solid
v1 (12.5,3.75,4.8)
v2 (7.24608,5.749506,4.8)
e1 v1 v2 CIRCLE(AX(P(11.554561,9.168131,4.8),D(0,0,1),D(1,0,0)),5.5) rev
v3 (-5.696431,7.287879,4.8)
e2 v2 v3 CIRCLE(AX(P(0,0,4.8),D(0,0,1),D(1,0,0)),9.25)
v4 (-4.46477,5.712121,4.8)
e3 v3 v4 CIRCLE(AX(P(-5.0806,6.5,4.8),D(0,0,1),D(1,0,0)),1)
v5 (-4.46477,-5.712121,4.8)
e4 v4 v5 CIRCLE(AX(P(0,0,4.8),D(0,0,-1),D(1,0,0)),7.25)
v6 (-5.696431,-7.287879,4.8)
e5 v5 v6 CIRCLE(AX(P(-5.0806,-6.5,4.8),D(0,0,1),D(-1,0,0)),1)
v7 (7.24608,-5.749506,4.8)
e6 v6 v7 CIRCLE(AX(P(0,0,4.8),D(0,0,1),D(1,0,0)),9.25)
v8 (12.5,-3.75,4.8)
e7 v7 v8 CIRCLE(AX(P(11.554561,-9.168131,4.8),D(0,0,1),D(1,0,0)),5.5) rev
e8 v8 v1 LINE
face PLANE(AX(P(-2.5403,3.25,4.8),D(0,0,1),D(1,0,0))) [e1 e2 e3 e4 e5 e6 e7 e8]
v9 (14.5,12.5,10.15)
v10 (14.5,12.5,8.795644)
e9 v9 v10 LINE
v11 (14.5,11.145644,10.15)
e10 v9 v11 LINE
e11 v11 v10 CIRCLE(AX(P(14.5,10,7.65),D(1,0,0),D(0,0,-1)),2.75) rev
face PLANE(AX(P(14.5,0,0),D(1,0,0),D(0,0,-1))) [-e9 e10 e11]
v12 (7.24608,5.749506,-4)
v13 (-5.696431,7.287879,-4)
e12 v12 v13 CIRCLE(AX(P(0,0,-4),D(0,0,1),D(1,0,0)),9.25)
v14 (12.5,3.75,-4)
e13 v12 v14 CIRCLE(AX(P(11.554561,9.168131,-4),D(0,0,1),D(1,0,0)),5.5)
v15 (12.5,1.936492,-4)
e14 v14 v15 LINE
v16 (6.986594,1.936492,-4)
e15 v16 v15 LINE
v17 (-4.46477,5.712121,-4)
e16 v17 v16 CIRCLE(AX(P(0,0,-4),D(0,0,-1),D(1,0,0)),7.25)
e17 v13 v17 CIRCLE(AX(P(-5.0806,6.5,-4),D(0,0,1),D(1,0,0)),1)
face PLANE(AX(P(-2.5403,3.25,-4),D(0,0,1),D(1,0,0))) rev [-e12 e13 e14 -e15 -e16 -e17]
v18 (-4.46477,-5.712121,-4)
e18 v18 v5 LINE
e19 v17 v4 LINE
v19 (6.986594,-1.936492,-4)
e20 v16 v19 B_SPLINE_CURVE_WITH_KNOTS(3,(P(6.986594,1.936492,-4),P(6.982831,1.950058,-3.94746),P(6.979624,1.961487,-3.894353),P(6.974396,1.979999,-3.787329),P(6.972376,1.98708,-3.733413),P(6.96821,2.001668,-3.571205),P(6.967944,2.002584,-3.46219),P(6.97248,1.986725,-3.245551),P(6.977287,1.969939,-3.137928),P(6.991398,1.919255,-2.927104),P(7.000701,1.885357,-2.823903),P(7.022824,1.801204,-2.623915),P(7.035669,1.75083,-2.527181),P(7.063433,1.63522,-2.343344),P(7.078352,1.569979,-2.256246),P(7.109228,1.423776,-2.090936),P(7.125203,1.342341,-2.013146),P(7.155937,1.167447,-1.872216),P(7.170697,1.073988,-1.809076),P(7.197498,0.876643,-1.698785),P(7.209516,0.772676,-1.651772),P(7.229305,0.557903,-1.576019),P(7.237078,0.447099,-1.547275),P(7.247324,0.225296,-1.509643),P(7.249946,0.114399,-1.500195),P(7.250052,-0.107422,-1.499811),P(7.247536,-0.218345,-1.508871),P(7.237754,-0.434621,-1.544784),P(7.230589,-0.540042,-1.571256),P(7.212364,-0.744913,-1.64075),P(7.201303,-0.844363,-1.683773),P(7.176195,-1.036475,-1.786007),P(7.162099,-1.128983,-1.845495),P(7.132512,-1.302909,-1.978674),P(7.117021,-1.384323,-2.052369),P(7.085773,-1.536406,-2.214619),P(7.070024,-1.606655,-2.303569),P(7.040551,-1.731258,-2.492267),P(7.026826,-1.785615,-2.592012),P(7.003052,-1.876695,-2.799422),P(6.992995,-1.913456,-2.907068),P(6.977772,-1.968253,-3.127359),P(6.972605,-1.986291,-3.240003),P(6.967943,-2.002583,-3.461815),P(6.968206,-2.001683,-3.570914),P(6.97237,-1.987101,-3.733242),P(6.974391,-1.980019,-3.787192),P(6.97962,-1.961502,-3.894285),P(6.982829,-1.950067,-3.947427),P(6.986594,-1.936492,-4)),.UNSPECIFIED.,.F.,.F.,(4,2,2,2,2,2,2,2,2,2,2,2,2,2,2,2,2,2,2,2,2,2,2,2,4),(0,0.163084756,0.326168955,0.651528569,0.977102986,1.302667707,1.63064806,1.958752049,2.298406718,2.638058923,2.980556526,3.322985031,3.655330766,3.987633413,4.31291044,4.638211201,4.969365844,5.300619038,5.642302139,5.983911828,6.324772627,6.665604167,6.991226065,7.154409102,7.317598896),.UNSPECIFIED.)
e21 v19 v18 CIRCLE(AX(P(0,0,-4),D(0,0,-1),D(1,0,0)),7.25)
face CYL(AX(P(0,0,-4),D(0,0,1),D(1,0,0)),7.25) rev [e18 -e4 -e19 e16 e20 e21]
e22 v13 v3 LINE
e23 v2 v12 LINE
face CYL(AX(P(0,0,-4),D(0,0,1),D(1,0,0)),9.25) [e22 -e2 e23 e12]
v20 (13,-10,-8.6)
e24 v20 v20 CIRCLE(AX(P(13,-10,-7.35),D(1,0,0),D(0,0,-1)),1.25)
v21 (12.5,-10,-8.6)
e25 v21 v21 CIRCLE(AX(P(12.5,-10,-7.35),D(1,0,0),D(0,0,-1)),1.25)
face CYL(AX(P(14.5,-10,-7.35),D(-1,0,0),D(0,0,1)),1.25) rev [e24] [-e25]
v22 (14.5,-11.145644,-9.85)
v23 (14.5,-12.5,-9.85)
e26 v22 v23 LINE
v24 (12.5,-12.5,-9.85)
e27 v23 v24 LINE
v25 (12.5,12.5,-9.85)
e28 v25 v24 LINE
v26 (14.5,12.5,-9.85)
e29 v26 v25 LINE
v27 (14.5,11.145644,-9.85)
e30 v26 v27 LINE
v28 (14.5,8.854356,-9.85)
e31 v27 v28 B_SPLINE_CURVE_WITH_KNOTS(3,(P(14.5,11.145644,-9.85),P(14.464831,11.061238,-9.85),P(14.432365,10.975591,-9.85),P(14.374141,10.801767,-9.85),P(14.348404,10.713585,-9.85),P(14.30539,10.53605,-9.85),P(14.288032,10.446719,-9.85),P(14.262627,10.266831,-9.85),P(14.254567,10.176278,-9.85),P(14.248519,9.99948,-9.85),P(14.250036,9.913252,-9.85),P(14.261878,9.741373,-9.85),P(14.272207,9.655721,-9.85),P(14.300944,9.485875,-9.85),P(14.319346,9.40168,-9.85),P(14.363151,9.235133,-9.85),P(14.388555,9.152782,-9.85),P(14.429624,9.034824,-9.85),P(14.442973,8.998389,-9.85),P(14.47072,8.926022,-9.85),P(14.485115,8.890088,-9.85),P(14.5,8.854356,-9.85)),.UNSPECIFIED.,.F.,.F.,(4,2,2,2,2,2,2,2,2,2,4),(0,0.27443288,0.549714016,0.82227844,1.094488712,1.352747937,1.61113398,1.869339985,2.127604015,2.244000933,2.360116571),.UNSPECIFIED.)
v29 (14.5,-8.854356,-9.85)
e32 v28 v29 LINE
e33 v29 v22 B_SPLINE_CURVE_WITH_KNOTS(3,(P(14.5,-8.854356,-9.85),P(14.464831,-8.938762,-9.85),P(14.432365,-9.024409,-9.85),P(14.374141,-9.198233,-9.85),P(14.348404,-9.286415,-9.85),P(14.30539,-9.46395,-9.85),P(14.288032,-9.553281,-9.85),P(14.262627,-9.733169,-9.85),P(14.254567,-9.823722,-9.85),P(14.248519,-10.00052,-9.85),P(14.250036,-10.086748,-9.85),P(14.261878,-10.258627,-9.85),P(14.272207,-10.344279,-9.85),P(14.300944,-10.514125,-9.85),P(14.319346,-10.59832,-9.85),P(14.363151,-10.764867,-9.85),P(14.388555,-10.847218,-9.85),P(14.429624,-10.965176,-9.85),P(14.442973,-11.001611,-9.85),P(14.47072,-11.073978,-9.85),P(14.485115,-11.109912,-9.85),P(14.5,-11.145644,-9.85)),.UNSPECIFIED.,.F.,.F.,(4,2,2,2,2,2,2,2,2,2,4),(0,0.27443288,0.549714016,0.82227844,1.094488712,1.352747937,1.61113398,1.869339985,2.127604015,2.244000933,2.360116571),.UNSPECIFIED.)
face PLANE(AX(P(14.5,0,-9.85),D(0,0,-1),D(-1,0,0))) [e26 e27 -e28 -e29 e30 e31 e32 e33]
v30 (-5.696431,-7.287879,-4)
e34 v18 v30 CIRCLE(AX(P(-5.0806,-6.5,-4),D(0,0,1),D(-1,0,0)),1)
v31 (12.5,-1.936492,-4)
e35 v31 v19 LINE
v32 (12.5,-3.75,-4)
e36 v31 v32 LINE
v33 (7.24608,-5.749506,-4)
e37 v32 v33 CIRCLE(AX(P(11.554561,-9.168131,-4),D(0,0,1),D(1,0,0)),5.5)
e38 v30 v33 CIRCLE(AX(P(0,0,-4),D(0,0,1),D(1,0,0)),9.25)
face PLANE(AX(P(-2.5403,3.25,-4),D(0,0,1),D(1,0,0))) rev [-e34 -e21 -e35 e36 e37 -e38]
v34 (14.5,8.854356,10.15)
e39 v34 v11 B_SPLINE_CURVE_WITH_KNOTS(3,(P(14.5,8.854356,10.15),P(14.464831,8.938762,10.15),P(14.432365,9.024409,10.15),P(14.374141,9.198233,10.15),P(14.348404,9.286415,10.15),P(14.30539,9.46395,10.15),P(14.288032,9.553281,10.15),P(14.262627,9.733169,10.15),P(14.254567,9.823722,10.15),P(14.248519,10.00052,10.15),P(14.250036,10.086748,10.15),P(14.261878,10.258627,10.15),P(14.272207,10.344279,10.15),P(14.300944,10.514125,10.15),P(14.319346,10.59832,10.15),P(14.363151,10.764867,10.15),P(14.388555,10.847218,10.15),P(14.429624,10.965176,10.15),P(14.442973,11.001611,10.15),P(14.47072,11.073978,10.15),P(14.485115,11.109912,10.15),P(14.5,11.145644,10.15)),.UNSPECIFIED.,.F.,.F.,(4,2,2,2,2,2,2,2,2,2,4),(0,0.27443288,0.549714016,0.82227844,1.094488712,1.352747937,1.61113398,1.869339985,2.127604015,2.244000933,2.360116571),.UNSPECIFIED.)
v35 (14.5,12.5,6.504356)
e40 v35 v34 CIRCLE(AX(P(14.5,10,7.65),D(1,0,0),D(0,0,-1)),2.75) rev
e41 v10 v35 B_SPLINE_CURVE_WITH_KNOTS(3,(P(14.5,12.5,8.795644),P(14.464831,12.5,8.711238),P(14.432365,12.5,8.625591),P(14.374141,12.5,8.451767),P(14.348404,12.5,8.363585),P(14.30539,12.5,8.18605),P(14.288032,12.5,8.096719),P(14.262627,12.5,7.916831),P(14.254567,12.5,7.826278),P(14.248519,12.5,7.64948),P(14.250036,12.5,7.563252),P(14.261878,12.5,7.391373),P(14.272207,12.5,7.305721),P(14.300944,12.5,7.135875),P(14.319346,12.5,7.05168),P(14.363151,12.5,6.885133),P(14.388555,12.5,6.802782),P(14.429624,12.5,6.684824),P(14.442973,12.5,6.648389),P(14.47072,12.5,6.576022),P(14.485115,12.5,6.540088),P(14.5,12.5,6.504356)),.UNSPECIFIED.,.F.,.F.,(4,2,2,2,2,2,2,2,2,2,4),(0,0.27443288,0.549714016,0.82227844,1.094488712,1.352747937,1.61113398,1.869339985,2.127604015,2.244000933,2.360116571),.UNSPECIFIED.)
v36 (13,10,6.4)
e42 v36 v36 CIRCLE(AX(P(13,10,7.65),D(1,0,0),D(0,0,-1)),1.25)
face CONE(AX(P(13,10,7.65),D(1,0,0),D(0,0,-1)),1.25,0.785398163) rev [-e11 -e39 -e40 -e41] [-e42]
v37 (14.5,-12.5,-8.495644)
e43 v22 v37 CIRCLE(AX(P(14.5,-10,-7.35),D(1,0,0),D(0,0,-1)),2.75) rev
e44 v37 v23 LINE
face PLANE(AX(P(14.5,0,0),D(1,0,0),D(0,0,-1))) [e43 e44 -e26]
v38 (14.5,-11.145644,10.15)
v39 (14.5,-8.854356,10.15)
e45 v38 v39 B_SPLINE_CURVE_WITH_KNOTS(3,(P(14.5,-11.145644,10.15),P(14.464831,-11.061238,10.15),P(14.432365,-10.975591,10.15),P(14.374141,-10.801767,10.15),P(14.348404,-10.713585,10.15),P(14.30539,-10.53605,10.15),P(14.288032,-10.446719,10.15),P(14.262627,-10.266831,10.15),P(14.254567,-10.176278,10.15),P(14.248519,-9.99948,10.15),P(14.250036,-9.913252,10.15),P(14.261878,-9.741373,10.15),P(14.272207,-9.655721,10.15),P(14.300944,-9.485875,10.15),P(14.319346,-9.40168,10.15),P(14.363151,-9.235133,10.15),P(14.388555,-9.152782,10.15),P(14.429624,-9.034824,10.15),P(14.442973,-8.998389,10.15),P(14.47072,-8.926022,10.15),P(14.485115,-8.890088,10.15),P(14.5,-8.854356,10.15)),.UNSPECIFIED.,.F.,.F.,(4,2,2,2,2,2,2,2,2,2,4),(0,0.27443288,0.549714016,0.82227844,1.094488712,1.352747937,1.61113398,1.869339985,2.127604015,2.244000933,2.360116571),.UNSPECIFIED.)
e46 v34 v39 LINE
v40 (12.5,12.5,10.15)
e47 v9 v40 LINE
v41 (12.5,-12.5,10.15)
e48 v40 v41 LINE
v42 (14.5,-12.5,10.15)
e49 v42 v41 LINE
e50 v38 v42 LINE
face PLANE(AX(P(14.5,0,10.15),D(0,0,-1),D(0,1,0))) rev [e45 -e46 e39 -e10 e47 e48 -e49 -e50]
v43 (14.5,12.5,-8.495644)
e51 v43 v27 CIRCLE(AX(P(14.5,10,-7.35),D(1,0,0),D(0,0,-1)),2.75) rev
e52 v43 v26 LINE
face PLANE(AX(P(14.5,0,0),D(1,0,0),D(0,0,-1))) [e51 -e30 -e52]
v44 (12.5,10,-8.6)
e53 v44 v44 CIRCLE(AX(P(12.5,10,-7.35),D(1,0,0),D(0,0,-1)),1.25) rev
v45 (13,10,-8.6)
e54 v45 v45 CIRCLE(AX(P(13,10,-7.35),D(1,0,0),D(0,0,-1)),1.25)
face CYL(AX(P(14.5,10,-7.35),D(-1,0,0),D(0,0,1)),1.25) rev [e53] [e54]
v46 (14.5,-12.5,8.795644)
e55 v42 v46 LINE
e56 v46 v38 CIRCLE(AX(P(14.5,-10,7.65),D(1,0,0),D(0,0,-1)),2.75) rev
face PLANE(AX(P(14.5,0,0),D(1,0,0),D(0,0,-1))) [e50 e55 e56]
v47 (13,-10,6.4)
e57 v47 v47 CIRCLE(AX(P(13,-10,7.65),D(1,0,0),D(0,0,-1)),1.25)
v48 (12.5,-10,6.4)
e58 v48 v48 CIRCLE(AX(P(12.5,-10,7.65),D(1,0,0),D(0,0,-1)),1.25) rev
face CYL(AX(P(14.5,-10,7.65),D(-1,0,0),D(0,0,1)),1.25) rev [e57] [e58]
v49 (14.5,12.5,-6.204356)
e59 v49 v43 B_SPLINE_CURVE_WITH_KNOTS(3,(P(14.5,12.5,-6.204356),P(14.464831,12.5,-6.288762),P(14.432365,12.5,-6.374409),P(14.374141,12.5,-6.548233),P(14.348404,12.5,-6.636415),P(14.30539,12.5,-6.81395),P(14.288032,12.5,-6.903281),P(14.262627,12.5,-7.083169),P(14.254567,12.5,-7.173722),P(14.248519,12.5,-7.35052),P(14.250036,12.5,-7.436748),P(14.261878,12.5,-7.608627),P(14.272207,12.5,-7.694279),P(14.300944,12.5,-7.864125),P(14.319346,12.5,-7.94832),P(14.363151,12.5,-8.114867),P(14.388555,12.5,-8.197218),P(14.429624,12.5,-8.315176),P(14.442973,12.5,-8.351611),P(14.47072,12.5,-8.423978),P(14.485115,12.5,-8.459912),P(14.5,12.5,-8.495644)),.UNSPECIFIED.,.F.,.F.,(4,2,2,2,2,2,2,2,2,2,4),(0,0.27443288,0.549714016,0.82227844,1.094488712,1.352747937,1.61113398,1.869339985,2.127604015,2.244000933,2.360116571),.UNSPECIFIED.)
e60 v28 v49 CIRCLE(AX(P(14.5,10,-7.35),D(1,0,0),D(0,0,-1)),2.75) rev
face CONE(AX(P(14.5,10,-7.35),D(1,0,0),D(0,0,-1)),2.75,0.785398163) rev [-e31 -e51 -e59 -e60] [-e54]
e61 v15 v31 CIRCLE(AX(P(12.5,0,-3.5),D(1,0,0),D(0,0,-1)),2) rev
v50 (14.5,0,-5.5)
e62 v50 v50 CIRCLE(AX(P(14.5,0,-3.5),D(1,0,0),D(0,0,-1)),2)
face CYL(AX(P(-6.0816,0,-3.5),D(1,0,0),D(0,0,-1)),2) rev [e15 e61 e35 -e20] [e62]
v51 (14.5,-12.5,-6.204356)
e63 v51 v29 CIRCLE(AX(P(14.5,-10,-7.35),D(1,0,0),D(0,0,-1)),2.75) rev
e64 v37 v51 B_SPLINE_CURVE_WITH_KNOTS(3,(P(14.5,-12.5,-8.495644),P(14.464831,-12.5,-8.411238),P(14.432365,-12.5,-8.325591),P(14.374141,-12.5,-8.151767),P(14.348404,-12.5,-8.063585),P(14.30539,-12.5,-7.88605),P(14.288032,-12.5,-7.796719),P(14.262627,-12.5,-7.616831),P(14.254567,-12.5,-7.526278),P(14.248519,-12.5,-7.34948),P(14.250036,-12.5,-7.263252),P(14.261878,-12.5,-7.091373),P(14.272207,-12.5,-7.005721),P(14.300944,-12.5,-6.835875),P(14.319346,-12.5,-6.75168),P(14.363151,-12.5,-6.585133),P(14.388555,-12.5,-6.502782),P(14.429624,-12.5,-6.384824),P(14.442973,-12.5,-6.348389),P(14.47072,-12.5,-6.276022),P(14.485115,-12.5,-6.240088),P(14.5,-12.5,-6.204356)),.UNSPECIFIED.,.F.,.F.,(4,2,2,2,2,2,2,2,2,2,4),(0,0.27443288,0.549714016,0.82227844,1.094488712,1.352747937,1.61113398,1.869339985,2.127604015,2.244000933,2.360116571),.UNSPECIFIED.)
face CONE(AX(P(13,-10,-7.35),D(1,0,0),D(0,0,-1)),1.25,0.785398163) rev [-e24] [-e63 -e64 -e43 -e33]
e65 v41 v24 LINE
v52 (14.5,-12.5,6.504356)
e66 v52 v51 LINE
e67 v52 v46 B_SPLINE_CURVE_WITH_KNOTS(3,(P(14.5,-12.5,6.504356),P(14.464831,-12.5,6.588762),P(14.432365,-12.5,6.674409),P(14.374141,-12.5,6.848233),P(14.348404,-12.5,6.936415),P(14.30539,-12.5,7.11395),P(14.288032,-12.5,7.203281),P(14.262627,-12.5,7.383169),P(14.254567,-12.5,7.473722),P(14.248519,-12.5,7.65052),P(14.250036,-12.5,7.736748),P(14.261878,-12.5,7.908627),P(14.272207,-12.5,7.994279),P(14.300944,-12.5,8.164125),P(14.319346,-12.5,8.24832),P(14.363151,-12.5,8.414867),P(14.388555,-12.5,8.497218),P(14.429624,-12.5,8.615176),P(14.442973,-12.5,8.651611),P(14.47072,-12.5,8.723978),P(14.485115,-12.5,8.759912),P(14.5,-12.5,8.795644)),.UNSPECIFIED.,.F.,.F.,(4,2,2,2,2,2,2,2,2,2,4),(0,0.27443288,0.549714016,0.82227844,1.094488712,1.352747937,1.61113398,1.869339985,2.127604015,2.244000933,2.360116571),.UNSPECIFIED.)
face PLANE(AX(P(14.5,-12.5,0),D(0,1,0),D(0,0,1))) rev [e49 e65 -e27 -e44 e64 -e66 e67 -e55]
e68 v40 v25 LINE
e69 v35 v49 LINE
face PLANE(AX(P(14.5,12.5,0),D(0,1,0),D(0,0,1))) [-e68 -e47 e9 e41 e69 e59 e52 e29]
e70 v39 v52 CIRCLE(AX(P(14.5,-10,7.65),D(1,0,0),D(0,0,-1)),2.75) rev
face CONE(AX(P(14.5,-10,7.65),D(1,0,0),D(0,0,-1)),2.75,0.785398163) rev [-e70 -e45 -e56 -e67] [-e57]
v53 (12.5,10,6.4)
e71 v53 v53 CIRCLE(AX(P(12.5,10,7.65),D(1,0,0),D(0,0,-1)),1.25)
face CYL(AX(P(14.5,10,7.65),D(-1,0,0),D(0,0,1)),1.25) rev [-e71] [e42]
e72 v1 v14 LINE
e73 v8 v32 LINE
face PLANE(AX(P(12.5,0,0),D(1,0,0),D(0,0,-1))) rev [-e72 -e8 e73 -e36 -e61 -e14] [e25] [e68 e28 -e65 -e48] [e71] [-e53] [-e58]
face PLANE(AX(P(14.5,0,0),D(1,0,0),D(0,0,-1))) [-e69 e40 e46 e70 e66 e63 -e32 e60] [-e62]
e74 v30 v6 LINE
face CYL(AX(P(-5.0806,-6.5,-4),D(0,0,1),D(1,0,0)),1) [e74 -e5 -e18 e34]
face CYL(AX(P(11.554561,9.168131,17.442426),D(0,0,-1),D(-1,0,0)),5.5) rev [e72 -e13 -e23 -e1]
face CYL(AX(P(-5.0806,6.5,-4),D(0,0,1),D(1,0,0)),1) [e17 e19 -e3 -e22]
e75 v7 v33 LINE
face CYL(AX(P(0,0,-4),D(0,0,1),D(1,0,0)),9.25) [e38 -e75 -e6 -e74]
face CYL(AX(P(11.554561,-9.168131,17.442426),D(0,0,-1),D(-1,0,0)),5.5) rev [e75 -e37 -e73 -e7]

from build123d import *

# Parameters (mm, degrees)
EXTRUDE_5_DEPTH        = 4.8
EXTRUDE_5_DEPTH_BACK   = 4
EXTRUDE_START          = -4
EXTRUDE_902_DEPTH      = 8.8
SKETCH_8_W             = 20
SKETCH_8_H             = 25
SKETCH_8_R             = 1.25
EXTRUDE_2674_DEPTH     = 2
CHAMFER_2_SIZE         = 1.5
CUT_EXTRUDE_2965_REACH = 28.131
SKETCH_9_R             = 2


with BuildPart() as part:
    # Эскиз1 → Выталкивающая часть (С ПАЗАМИ В ОБЕ СТОРОНЫ ВЫДАВИТЬ НА 5ММ) (new, two sides: drawn at the far end of the back side and taken through both)
    with BuildSketch(Plane.XY.offset(-EXTRUDE_5_DEPTH_BACK)):
        with BuildLine():
            ThreePointArc((-4.464770012, -5.712121212), (7.25, 0), (-4.464770012, 5.712121212))
            ThreePointArc((-4.464770012, 5.712121212), (-5.868479146, 5.884169654), (-5.696430705, 7.287878788))
            ThreePointArc((-5.696430705, 7.287878788), (9.25, 0), (-5.696430705, -7.287878788))
            ThreePointArc((-5.696430705, -7.287878788), (-5.868479146, -5.884169654), (-4.464770012, -5.712121212))
        make_face()
    extrude(amount=EXTRUDE_5_DEPTH + EXTRUDE_5_DEPTH_BACK)

    # Эскиз2 → Extrude 902 (add)
    with BuildSketch(Plane.XY.offset(EXTRUDE_START)):
        with BuildLine():
            Line((12.5, 3.75), (12.5, -3.75))
            ThreePointArc((12.5, -3.75), (9.598284348, -4.027802018), (7.246080423, -5.749505936))
            ThreePointArc((7.246080423, -5.749505936), (9.25, 0), (7.246080423, 5.749505936))
            ThreePointArc((7.246080423, 5.749505936), (9.598284348, 4.027802018), (12.5, 3.75))
        make_face()
    extrude(amount=EXTRUDE_902_DEPTH)

    # Эскиз8 → Extrude 2674 (add)
    with BuildSketch(Plane(origin=(12.5, 0, 0), x_dir=(0, 0, -1), z_dir=(1, 0, 0))):
        with Locations((-0.15, 0)):
            Rectangle(SKETCH_8_W, SKETCH_8_H)
        with Locations((-7.65, 10)):
            Circle(SKETCH_8_R, mode=Mode.SUBTRACT)
        with Locations((-7.65, -10)):
            Circle(SKETCH_8_R, mode=Mode.SUBTRACT)
        with Locations((7.35, -10)):
            Circle(SKETCH_8_R, mode=Mode.SUBTRACT)
        with Locations((7.35, 10)):
            Circle(SKETCH_8_R, mode=Mode.SUBTRACT)
    extrude(amount=EXTRUDE_2674_DEPTH)

    # Фаска2
    # the kernel refuses this chamfer: 1.5 mm, written as the material it takes off along each edge
    with BuildSketch(Plane(origin=(14.5, -10, -7.35), x_dir=(0, 0, -1), z_dir=(0, -1, 0))) as chamfer_2_piece_1:
        Polygon((1.25 + CHAMFER_2_SIZE, 0), (1.25, -CHAMFER_2_SIZE), (1.25, 0), align=None)
    revolve(axis=Axis((14.5, -10, -7.35), (1, 0, 0)), mode=Mode.SUBTRACT)
    with BuildSketch(Plane(origin=(14.5, 10, 7.65), x_dir=(0, 0, -1), z_dir=(0, -1, 0))) as chamfer_2_piece_2:
        Polygon((1.25 + CHAMFER_2_SIZE, 0), (1.25, -CHAMFER_2_SIZE), (1.25, 0), align=None)
    revolve(axis=Axis((14.5, 10, 7.65), (1, 0, 0)), mode=Mode.SUBTRACT)
    with BuildSketch(Plane(origin=(14.5, -10, 7.65), x_dir=(0, 0, -1), z_dir=(0, -1, 0))) as chamfer_2_piece_3:
        Polygon((1.25 + CHAMFER_2_SIZE, 0), (1.25, -CHAMFER_2_SIZE), (1.25, 0), align=None)
    revolve(axis=Axis((14.5, -10, 7.65), (1, 0, 0)), mode=Mode.SUBTRACT)
    with BuildSketch(Plane(origin=(14.5, 10, -7.35), x_dir=(0, 0, -1), z_dir=(0, -1, 0))) as chamfer_2_piece_4:
        Polygon((1.25 + CHAMFER_2_SIZE, 0), (1.25, -CHAMFER_2_SIZE), (1.25, 0), align=None)
    revolve(axis=Axis((14.5, 10, -7.35), (1, 0, 0)), mode=Mode.SUBTRACT)

    # Эскиз9 → Cut-Extrude 2965 (cut, up to next)
    with BuildSketch(Plane(origin=(14.5, 0, 0), x_dir=(0, 0, -1), z_dir=(1, 0, 0)), mode=Mode.PRIVATE) as cut_extrude_2965_sk1:
        with Locations((3.5, 0)):
            Circle(SKETCH_9_R)
    cut_extrude_2965_tool1 = extrude(cut_extrude_2965_sk1.sketch, amount=-CUT_EXTRUDE_2965_REACH, mode=Mode.PRIVATE) & part.part
    add(cut_extrude_2965_tool1.solids().sort_by_distance((14.5, 0, -3.5))[0], mode=Mode.SUBTRACT)


solid = part.part
